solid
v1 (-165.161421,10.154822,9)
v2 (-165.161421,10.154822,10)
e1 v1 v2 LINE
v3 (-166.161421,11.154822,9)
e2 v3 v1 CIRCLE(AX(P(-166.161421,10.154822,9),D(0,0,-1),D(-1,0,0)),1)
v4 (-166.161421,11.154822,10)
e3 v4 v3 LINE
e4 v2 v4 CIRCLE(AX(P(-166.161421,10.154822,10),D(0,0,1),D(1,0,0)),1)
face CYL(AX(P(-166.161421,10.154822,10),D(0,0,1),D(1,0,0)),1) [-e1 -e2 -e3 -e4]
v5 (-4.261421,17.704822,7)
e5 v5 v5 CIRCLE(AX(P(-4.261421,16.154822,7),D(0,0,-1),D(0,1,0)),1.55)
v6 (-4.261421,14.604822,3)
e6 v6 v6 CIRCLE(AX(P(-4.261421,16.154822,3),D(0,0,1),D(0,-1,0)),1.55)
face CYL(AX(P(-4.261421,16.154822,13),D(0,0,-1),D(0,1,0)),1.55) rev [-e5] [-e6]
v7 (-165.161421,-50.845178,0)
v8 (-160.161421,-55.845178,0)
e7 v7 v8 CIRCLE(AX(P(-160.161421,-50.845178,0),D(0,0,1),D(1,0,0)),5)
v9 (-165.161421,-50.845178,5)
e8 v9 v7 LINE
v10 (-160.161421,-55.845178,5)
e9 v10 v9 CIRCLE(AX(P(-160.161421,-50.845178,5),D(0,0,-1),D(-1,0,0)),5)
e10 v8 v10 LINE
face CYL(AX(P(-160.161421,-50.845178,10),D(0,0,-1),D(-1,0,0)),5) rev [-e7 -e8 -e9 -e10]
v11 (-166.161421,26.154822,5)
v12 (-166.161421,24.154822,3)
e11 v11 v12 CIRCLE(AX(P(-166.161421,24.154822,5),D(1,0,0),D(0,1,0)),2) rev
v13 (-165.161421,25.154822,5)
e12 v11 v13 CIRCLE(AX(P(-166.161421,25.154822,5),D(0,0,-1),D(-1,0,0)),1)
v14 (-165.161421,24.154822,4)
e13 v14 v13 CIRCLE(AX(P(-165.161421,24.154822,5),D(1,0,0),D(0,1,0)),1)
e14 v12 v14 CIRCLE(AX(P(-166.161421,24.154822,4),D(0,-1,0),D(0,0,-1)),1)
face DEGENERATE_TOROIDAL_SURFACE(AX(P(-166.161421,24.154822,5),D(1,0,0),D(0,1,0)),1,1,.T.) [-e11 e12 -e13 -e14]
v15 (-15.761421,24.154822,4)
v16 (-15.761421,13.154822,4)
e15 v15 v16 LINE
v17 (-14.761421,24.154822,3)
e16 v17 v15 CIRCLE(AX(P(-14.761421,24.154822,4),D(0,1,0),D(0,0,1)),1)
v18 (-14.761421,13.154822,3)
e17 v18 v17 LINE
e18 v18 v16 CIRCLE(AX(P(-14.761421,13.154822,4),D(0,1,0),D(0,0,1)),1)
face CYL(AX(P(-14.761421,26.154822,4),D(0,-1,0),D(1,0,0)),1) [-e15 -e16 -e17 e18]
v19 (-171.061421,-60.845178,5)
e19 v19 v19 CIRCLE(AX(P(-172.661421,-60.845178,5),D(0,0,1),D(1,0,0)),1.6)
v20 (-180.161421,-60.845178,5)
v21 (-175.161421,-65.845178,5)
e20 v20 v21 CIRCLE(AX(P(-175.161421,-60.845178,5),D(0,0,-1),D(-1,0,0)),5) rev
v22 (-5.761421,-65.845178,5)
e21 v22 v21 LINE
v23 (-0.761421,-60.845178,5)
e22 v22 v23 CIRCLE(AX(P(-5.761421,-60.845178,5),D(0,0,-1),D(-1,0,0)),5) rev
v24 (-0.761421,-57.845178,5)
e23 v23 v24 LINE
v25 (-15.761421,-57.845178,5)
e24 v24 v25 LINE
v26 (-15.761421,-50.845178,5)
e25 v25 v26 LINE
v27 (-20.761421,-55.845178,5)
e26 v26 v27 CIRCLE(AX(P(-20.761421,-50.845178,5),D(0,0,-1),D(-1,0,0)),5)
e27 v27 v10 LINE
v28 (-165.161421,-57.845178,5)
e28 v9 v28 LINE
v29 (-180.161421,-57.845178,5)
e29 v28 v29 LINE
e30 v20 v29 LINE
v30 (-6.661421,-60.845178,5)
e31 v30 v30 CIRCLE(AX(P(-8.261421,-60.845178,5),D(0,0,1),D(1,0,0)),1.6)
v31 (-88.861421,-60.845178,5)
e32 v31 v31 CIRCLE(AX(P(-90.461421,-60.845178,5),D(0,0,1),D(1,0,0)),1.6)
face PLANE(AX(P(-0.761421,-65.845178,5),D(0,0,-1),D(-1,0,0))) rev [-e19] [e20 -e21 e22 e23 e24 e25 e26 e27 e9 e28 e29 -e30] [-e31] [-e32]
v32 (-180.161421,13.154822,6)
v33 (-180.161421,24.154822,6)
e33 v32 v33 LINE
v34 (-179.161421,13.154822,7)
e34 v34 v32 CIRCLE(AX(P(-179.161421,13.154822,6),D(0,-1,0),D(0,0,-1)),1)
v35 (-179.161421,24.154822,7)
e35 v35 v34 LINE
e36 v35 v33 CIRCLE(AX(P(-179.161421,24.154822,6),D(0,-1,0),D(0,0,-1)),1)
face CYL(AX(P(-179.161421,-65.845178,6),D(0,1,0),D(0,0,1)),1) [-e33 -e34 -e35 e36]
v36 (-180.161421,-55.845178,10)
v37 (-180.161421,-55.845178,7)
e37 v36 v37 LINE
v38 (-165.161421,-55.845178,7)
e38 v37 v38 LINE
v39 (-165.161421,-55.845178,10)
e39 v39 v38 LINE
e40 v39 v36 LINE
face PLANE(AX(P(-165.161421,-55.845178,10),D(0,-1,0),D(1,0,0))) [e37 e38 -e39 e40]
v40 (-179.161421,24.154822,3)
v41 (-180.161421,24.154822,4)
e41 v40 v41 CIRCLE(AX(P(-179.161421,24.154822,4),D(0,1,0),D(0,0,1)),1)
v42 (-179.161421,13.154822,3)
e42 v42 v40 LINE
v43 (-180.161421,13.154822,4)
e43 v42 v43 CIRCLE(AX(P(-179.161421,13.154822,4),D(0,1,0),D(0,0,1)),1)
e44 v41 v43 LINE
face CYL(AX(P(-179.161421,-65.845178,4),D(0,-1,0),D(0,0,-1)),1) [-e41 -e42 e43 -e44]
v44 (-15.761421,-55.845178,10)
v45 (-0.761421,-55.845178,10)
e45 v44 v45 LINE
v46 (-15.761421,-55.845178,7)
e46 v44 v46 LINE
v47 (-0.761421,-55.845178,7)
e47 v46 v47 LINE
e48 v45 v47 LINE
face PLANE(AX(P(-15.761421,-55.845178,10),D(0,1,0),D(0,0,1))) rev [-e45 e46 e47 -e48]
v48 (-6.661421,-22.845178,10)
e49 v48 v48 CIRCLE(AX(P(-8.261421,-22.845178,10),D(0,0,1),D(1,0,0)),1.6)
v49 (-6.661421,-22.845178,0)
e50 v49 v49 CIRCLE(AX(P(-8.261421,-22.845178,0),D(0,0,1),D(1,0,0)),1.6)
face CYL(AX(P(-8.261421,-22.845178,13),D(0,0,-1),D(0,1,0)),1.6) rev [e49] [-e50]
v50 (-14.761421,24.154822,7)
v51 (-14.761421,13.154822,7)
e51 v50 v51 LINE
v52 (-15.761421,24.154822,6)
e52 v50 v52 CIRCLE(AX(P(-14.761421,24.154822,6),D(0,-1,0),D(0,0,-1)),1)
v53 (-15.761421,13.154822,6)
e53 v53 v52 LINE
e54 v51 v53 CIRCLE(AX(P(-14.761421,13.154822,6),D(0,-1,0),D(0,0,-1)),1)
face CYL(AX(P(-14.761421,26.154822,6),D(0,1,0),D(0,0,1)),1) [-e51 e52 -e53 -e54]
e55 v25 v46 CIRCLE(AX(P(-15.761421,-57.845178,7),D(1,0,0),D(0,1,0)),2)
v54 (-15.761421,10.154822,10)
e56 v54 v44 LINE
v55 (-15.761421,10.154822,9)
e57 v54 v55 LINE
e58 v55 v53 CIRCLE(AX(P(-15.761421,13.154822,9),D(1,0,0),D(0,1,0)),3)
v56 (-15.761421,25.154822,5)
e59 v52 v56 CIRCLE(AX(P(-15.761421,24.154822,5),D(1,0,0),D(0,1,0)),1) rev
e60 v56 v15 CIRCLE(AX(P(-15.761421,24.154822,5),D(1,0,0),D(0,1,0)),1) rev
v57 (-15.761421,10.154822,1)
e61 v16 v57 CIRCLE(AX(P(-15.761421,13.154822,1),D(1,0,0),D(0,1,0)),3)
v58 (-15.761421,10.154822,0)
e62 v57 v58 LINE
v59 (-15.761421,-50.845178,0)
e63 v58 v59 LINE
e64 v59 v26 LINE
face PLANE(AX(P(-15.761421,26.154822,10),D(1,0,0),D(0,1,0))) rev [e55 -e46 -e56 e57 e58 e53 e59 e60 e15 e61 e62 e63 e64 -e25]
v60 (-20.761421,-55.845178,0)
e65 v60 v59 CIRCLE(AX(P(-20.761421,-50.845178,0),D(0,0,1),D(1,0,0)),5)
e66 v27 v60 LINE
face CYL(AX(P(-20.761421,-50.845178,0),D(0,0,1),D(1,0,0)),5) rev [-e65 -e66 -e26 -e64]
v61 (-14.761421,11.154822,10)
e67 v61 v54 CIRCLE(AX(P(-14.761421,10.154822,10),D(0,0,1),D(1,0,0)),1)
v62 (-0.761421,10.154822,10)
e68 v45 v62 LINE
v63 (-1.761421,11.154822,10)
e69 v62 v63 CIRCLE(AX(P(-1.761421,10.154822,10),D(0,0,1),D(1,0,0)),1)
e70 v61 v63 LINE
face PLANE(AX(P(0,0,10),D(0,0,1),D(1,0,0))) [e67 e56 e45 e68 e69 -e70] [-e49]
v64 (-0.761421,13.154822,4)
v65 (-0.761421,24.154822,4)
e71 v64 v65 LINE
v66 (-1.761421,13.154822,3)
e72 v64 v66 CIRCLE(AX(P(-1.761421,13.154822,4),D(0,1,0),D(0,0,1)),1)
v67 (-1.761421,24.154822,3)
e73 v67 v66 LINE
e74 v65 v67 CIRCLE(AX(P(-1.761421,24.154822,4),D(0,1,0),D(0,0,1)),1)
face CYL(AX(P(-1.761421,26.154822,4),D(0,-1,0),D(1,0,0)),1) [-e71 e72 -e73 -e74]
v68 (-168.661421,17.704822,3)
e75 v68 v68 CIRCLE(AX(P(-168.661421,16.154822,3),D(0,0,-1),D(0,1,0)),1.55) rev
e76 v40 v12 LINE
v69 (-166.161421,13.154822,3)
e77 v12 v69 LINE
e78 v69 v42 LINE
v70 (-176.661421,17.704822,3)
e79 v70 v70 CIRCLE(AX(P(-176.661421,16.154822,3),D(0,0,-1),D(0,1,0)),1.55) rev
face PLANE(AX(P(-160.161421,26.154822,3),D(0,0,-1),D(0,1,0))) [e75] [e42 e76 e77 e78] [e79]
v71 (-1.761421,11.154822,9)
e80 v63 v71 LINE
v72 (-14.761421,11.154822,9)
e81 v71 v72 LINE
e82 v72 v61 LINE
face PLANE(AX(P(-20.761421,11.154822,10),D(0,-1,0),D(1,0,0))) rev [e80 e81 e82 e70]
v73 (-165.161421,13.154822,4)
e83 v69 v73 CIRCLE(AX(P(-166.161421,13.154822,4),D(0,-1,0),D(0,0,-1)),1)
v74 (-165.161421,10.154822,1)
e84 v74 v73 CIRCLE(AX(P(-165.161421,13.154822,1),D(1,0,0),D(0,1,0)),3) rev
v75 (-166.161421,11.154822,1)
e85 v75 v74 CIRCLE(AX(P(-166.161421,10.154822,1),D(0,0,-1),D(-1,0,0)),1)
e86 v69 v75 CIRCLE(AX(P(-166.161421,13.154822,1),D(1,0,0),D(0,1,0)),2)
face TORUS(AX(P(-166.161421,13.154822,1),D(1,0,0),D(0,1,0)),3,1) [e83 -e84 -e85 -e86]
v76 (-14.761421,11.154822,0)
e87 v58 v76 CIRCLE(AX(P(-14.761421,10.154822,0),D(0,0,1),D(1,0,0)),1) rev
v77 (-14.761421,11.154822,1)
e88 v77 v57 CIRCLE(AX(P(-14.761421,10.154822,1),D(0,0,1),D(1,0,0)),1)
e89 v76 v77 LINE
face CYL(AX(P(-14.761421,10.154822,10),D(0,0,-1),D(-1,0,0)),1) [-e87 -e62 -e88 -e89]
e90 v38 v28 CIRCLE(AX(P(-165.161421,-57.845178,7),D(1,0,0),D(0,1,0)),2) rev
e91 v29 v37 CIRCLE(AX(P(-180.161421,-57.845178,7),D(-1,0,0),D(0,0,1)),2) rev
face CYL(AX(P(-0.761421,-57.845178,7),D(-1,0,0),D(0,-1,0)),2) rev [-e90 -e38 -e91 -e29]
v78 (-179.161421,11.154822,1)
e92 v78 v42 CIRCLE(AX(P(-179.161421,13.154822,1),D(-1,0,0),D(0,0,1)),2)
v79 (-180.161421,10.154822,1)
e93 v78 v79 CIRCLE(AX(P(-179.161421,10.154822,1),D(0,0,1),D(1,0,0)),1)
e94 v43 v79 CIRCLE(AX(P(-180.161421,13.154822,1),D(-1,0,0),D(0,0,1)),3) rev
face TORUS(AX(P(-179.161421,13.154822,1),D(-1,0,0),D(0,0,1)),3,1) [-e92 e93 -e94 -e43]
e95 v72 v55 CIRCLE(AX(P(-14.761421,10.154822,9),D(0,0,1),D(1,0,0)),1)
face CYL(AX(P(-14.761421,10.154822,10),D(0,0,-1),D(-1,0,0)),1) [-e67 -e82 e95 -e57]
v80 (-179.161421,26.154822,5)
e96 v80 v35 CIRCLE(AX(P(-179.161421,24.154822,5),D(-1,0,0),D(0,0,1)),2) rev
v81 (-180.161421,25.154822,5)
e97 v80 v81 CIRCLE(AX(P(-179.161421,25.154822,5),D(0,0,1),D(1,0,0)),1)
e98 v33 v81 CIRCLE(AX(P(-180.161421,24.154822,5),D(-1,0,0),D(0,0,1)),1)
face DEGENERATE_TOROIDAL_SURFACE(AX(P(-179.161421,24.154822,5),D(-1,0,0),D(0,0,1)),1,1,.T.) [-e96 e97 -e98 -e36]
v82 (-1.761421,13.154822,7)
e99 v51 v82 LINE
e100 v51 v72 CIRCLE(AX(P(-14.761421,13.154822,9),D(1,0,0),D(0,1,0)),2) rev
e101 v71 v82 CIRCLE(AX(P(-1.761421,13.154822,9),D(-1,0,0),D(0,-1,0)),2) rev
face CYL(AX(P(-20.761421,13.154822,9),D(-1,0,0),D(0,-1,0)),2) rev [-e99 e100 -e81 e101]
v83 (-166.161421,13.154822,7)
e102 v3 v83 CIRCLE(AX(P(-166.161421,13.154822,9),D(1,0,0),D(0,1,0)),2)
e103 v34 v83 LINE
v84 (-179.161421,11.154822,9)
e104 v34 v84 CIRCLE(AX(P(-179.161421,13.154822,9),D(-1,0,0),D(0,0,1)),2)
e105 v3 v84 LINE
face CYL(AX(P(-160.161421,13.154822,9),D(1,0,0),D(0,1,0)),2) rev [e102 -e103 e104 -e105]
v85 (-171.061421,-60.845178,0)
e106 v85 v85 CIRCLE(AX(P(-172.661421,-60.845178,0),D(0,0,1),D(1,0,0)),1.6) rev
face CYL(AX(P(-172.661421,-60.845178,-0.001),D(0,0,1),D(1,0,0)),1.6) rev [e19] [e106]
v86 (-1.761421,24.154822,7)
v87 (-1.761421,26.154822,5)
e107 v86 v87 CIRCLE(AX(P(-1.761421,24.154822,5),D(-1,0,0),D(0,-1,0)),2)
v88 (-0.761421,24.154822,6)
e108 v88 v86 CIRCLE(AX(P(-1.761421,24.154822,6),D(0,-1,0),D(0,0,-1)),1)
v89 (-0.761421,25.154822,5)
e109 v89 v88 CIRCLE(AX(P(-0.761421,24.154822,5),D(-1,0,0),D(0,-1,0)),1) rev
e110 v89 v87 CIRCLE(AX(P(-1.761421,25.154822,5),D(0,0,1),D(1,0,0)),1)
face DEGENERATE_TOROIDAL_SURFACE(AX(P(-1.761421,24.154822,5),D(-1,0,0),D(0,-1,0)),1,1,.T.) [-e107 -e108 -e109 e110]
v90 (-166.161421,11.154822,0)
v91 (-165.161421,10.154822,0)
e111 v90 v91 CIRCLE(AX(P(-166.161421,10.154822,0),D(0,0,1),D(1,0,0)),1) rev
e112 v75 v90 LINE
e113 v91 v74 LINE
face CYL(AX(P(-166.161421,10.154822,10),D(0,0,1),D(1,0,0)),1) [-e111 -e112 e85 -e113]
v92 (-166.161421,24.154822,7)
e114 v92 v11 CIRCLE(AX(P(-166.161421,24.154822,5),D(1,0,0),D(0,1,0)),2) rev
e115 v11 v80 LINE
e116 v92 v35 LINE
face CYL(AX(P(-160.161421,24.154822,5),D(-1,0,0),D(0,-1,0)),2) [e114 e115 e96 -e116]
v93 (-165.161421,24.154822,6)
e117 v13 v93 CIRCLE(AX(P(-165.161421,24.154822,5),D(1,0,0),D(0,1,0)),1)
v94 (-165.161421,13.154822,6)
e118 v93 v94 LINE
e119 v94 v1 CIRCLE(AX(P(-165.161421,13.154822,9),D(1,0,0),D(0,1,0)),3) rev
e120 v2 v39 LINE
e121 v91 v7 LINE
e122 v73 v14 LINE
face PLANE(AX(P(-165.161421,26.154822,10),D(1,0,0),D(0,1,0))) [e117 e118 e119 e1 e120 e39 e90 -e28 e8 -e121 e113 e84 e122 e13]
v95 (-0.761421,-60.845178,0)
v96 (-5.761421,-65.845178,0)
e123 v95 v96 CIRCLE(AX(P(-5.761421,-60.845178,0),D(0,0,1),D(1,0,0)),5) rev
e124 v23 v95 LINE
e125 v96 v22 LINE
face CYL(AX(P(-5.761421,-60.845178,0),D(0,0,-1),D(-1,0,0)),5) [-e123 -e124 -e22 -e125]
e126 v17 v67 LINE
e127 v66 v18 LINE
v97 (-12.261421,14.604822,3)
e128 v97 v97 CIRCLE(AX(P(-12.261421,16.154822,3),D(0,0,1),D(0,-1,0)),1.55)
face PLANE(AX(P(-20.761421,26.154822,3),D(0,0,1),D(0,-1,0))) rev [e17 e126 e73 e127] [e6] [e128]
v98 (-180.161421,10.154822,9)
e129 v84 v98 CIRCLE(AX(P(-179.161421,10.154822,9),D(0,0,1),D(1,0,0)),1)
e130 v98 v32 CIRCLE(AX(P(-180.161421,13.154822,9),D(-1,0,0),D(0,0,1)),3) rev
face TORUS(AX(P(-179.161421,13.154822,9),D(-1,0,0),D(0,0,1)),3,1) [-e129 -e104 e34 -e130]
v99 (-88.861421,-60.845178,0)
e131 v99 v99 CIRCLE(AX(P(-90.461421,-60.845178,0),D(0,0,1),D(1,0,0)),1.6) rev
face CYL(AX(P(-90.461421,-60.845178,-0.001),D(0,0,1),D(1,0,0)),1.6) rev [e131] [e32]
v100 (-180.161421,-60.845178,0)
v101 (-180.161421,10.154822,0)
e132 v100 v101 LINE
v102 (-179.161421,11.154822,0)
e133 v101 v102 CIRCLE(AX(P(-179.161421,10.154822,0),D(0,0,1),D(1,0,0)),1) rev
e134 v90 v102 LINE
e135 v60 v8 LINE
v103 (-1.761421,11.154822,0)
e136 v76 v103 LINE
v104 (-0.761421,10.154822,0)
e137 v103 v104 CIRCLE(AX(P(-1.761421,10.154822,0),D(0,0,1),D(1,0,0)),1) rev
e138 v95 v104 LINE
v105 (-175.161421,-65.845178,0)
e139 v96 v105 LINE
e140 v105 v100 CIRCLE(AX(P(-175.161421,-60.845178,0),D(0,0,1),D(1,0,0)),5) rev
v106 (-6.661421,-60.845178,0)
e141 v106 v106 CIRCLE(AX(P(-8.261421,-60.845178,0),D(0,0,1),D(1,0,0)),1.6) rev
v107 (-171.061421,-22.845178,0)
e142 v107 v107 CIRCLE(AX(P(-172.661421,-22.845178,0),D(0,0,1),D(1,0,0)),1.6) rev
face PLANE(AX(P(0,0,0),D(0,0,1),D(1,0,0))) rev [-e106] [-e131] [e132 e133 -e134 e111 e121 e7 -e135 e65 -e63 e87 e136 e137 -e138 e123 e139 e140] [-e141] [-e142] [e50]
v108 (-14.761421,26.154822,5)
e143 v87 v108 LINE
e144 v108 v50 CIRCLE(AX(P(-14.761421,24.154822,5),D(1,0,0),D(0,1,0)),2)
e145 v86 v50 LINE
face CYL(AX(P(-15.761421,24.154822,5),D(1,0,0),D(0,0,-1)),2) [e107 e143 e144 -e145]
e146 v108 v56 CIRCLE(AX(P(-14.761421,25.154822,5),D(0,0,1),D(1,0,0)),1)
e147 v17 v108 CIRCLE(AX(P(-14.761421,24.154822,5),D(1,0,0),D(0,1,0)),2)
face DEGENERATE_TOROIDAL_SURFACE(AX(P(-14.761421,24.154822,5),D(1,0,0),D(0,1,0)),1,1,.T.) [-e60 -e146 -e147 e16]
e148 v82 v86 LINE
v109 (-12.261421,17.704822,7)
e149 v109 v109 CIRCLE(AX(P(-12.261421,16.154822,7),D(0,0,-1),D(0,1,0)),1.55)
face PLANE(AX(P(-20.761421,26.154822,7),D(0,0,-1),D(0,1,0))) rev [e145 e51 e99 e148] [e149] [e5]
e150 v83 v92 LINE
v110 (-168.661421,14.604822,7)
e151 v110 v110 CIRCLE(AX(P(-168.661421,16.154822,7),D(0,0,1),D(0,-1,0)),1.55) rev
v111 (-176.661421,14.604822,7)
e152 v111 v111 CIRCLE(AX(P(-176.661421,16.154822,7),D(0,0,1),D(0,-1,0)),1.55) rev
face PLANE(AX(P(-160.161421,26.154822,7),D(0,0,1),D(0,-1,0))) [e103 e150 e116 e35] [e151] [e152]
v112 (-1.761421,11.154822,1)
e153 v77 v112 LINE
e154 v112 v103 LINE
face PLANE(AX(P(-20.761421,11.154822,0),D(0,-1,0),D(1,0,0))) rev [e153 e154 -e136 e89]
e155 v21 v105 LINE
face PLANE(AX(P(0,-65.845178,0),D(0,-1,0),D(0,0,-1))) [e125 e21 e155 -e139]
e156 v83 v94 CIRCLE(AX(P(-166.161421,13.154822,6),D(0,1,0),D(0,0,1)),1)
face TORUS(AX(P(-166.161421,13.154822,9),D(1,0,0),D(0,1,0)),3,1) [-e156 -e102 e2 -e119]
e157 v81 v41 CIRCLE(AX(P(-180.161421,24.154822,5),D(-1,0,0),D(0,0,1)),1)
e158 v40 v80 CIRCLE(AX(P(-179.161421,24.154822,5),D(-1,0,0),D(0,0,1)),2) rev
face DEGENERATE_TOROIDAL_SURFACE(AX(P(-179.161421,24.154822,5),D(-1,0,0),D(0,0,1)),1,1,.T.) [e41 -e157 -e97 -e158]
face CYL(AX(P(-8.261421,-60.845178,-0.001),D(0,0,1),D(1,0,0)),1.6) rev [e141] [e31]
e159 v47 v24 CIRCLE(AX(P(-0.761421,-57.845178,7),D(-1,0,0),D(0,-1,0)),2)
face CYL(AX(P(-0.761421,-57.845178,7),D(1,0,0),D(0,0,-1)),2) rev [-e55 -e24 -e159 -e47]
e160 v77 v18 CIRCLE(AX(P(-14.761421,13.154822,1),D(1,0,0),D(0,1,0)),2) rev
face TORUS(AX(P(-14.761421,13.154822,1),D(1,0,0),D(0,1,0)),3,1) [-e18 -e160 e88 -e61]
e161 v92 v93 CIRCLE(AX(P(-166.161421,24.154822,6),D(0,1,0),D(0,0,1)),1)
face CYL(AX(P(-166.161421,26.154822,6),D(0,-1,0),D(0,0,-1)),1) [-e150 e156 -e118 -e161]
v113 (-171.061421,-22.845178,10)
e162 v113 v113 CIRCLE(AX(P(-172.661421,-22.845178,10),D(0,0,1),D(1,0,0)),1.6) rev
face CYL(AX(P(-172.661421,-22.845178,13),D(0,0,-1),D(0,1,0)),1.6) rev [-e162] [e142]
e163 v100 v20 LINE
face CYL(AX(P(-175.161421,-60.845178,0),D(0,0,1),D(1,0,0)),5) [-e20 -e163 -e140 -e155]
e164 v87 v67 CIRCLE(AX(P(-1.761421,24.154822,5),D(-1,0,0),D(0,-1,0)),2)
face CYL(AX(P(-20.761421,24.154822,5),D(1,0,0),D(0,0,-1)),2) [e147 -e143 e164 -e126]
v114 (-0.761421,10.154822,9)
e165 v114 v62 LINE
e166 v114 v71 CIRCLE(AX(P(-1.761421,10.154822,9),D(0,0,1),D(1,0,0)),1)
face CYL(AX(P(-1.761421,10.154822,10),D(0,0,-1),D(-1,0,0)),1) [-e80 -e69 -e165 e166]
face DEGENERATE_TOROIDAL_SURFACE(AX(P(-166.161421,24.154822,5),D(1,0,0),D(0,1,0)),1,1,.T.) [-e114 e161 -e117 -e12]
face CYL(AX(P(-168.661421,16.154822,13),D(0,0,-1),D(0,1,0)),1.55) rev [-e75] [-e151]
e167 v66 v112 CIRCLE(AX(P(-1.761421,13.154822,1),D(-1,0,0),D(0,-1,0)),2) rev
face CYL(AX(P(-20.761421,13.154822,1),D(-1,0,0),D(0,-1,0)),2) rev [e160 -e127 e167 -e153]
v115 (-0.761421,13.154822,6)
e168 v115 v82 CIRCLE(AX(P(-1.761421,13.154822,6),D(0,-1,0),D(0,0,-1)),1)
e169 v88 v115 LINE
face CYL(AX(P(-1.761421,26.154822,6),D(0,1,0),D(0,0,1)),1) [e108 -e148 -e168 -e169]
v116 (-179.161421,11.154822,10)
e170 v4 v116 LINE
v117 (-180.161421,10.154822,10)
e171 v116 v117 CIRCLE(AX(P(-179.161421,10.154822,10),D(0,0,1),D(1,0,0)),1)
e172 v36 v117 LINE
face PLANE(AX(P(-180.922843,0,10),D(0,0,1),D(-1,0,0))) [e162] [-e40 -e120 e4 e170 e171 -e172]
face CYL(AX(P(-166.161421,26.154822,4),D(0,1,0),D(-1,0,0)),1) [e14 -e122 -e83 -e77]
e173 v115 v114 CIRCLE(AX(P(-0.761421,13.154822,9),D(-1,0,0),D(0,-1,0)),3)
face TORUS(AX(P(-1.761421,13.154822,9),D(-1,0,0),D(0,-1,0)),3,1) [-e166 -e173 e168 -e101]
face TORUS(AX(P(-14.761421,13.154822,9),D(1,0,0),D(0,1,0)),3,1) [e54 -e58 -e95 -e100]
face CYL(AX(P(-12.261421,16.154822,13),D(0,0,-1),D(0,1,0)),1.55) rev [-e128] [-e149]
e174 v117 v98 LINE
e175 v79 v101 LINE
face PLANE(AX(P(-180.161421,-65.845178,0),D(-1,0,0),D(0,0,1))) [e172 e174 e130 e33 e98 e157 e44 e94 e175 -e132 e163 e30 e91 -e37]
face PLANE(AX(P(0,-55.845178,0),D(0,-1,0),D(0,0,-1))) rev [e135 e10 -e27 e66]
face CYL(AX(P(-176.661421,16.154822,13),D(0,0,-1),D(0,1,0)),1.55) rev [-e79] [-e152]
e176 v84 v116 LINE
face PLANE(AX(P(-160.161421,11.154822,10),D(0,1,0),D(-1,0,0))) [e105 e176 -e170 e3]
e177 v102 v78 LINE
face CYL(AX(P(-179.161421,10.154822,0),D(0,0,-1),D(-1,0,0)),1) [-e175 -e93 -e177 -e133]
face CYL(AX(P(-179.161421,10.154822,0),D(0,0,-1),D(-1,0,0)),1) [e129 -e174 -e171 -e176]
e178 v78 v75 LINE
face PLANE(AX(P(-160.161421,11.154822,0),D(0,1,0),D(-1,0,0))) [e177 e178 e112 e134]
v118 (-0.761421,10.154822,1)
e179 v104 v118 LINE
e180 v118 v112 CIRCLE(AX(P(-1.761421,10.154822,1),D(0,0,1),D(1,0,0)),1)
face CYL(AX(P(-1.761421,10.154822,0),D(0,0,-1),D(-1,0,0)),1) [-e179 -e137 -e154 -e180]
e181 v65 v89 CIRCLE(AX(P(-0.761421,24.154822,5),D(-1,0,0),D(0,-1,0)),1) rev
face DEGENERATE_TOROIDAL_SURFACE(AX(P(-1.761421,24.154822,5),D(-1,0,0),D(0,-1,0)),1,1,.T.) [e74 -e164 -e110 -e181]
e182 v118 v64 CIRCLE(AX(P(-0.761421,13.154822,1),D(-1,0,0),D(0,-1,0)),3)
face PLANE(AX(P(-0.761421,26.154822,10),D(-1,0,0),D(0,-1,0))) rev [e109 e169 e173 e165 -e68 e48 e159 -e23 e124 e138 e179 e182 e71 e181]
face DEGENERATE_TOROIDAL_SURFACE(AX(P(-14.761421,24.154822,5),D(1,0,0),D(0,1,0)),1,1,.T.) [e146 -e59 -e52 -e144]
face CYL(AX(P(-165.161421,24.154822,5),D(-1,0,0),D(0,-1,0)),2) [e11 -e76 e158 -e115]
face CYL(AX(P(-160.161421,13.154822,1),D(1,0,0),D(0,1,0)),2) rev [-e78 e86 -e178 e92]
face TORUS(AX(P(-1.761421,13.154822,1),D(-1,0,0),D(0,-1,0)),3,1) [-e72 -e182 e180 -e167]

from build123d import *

# Parameters (mm, degrees)
SKETCH1_W            = 15
SKETCH1_H            = 82
BOSS_EXTRUDE1_DEPTH  = 10
SKETCH2_W            = 3
SKETCH2_H            = 15
CUT_EXTRUDE1_DEPTH   = 20
SKETCH3_R            = 1.55
SKETCH3_R_2          = 1.6
CUT_EXTRUDE2_DEPTH   = 10
FILLET1_START        = -17
FILLET1_DEPTH        = 17
FILLET1_START_2      = -15.76142132
FILLET1_2_DEPTH      = 15
FILLET3_R            = 1
SKETCH4_W            = 179.4
SKETCH4_H            = 5
BOSS_EXTRUDE3_DEPTH  = 10
FILLET3_OF_MIRROR3_R = 1
FILLET4_R            = 2
FILLET5_R            = 5
CUT_EXTRUDE3_REACH   = 193.882
SKETCH5_R            = 1.6


with BuildPart() as part:
    # Sketch1 → Boss-Extrude1 (new body)
    with BuildSketch(Plane.XY):
        with Locations((-8.26142132, -14.845177665)):
            Rectangle(SKETCH1_W, SKETCH1_H)
    boss_extrude1 = extrude(amount=BOSS_EXTRUDE1_DEPTH)

    # Sketch2 → Cut-Extrude1 (cut)
    with BuildSketch(Plane(origin=(-0.76142132, 0, 0), x_dir=(0, 0, -1), z_dir=(1, 0, 0))):
        with Locations((-1.5, 18.654822335)):
            Rectangle(SKETCH2_W, SKETCH2_H)
        with Locations((-8.5, 18.654822335)):
            Rectangle(SKETCH2_W, SKETCH2_H)
    cut_extrude1 = extrude(amount=-CUT_EXTRUDE1_DEPTH, mode=Mode.SUBTRACT)

    # Sketch3 → Cut-Extrude2 (cut, symmetric)
    with BuildSketch(Plane(origin=(0, 0, 3), x_dir=(-1, 0, 0), z_dir=(0, 0, -1))):
        with Locations(Location((4.26142132, 16.154822335, 0), (0, 0, 90))):
            Circle(SKETCH3_R)
        with Locations(Location((12.26142132, 16.154822335, 0), (0, 0, 90))):
            Circle(SKETCH3_R)
        with Locations(Location((8.26142132, -22.845177665, 0), (0, 0, 180))):
            Circle(SKETCH3_R_2)
    cut_extrude2 = extrude(amount=CUT_EXTRUDE2_DEPTH, both=True, mode=Mode.SUBTRACT)

    # Fillet1: read off the stored shape, not the designer's step
    # Fillet1 outline → Fillet1 (cut)
    with BuildSketch(Plane.YZ.offset(FILLET1_START)):
        with BuildLine():
            ThreePointArc((24.154822335, 7), (25.569035897, 6.414213562), (26.154822335, 5))
            Line((26.154822335, 5), (26.154822335, 7))
            Line((26.154822335, 7), (24.154822335, 7))
        make_face()
        with BuildLine():
            ThreePointArc((26.154822335, 5), (25.569035897, 3.585786438), (24.154822335, 3))
            Line((24.154822335, 3), (26.154822335, 3))
            Line((26.154822335, 3), (26.154822335, 5))
        make_face()
    fillet1 = extrude(amount=FILLET1_DEPTH, mode=Mode.SUBTRACT)

    # Fillet1 2 outline → Fillet1 2 (add)
    with BuildSketch(Plane.YZ.offset(FILLET1_START_2)):
        with BuildLine():
            Line((11.154822335, 7), (13.154822335, 7))
            ThreePointArc((13.154822335, 7), (11.740608773, 7.585786438), (11.154822335, 9))
            Line((11.154822335, 9), (11.154822335, 7))
        make_face()
        with BuildLine():
            ThreePointArc((11.154822335, 1), (11.740608773, 2.414213562), (13.154822335, 3))
            Line((13.154822335, 3), (11.154822335, 3))
            Line((11.154822335, 3), (11.154822335, 1))
        make_face()
    fillet1_2 = extrude(amount=FILLET1_2_DEPTH)

    # Fillet3
    fillet3_edges = [part.edges().sort_by_distance(p)[0] for p in [
        (-15.76142132, 11.154822335, 9.5),
        (-0.76142132, 11.154822335, 9.5),
        (-0.76142132, 11.154822335, 0.5),
        (-0.76142132, 18.654822335, 3),
        (-0.76142132, 18.654822335, 7),
        (-0.76142132, 25.569035897, 3.585786438),
        (-0.76142132, 25.569035897, 6.414213562),
        (-15.76142132, 18.654822335, 7),
        (-15.76142132, 18.654822335, 3),
        (-15.76142132, 11.154822335, 0.5),
        (-15.76142132, 25.569035897, 3.585786438),
        (-15.76142132, 25.569035897, 6.414213562),
        (-0.76142132, 11.740608773, 2.414213562),
        (-15.76142132, 11.740608773, 2.414213562),
        (-0.76142132, 11.740608773, 7.585786438),
        (-15.76142132, 11.740608773, 7.585786438),
    ]]
    fillet(fillet3_edges, radius=FILLET3_R)

    # Sketch4 → Boss-Extrude3 (add)
    with BuildSketch(Plane.XZ.offset(55.845177665)):
        with Locations((-90.46142132, 2.5)):
            Rectangle(SKETCH4_W, SKETCH4_H)
    extrude(amount=BOSS_EXTRUDE3_DEPTH)

    # Mirror3: Boss-Extrude1, Cut-Extrude1, Cut-Extrude2, Fillet1, Fillet1 2 across plane
    add(boss_extrude1.mirror(Plane.ZY.offset(90.46142132)))
    add(cut_extrude1.mirror(Plane.ZY.offset(90.46142132)), mode=Mode.SUBTRACT)
    add(cut_extrude2.mirror(Plane.ZY.offset(90.46142132)), mode=Mode.SUBTRACT)
    add(fillet1.mirror(Plane.ZY.offset(90.46142132)), mode=Mode.SUBTRACT)
    add(fillet1_2.mirror(Plane.ZY.offset(90.46142132)))

    # Fillet3 of Mirror3
    fillet3_of_mirror3_edges = [part.edges().sort_by_distance(p)[0] for p in [
        (-165.16142132, 11.154822335, 9.5),
        (-180.16142132, 11.154822335, 9.5),
        (-180.16142132, 11.154822335, 0.5),
        (-180.16142132, 18.654822335, 3),
        (-180.16142132, 18.654822335, 7),
        (-180.16142132, 25.569035897, 3.585786438),
        (-180.16142132, 25.569035897, 6.414213562),
        (-165.16142132, 18.654822335, 7),
        (-165.16142132, 18.654822335, 3),
        (-165.16142132, 11.154822335, 0.5),
        (-165.16142132, 25.569035897, 3.585786438),
        (-165.16142132, 25.569035897, 6.414213562),
        (-180.16142132, 11.740608773, 2.414213562),
        (-165.16142132, 11.740608773, 2.414213562),
        (-180.16142132, 11.740608773, 7.585786438),
        (-165.16142132, 11.740608773, 7.585786438),
    ]]
    fillet(fillet3_of_mirror3_edges, radius=FILLET3_OF_MIRROR3_R)

    # Fillet4
    fillet4_edges = [part.edges().sort_by_distance(p)[0] for p in [
        (-8.26142132, -55.845177665, 5),
        (-172.66142132, -55.845177665, 5),
    ]]
    fillet(fillet4_edges, radius=FILLET4_R)

    # Fillet5
    fillet5_edges = [part.edges().sort_by_distance(p)[0] for p in [
        (-15.76142132, -55.845177665, 2.5),
        (-180.16142132, -65.845177665, 2.5),
        (-0.76142132, -65.845177665, 2.5),
        (-165.16142132, -55.845177665, 2.5),
    ]]
    fillet(fillet5_edges, radius=FILLET5_R)

    # Sketch5 → Cut-Extrude3 (cut, up to next)
    with BuildSketch(Plane.XY.offset(5), mode=Mode.PRIVATE) as cut_extrude3_sk1:
        with Locations((-172.66142132, -60.845177665)):
            Circle(SKETCH5_R)
    cut_extrude3_tool1 = extrude(cut_extrude3_sk1.sketch, amount=-CUT_EXTRUDE3_REACH, mode=Mode.PRIVATE) & part.part
    # Sketch5 → Cut-Extrude3 (cut, up to next)
    with BuildSketch(Plane.XY.offset(5), mode=Mode.PRIVATE) as cut_extrude3_sk2:
        with Locations((-90.46142132, -60.845177665)):
            Circle(SKETCH5_R)
    cut_extrude3_tool2 = extrude(cut_extrude3_sk2.sketch, amount=-CUT_EXTRUDE3_REACH, mode=Mode.PRIVATE) & part.part
    # Sketch5 → Cut-Extrude3 (cut, up to next)
    with BuildSketch(Plane.XY.offset(5), mode=Mode.PRIVATE) as cut_extrude3_sk3:
        with Locations((-8.26142132, -60.845177665)):
            Circle(SKETCH5_R)
    cut_extrude3_tool3 = extrude(cut_extrude3_sk3.sketch, amount=-CUT_EXTRUDE3_REACH, mode=Mode.PRIVATE) & part.part
    add(cut_extrude3_tool1.solids().sort_by_distance((-172.661421, -60.845178, 5))[0], mode=Mode.SUBTRACT)
    add(cut_extrude3_tool2.solids().sort_by_distance((-90.461421, -60.845178, 5))[0], mode=Mode.SUBTRACT)
    add(cut_extrude3_tool3.solids().sort_by_distance((-8.261421, -60.845178, 5))[0], mode=Mode.SUBTRACT)


solid = part.part
